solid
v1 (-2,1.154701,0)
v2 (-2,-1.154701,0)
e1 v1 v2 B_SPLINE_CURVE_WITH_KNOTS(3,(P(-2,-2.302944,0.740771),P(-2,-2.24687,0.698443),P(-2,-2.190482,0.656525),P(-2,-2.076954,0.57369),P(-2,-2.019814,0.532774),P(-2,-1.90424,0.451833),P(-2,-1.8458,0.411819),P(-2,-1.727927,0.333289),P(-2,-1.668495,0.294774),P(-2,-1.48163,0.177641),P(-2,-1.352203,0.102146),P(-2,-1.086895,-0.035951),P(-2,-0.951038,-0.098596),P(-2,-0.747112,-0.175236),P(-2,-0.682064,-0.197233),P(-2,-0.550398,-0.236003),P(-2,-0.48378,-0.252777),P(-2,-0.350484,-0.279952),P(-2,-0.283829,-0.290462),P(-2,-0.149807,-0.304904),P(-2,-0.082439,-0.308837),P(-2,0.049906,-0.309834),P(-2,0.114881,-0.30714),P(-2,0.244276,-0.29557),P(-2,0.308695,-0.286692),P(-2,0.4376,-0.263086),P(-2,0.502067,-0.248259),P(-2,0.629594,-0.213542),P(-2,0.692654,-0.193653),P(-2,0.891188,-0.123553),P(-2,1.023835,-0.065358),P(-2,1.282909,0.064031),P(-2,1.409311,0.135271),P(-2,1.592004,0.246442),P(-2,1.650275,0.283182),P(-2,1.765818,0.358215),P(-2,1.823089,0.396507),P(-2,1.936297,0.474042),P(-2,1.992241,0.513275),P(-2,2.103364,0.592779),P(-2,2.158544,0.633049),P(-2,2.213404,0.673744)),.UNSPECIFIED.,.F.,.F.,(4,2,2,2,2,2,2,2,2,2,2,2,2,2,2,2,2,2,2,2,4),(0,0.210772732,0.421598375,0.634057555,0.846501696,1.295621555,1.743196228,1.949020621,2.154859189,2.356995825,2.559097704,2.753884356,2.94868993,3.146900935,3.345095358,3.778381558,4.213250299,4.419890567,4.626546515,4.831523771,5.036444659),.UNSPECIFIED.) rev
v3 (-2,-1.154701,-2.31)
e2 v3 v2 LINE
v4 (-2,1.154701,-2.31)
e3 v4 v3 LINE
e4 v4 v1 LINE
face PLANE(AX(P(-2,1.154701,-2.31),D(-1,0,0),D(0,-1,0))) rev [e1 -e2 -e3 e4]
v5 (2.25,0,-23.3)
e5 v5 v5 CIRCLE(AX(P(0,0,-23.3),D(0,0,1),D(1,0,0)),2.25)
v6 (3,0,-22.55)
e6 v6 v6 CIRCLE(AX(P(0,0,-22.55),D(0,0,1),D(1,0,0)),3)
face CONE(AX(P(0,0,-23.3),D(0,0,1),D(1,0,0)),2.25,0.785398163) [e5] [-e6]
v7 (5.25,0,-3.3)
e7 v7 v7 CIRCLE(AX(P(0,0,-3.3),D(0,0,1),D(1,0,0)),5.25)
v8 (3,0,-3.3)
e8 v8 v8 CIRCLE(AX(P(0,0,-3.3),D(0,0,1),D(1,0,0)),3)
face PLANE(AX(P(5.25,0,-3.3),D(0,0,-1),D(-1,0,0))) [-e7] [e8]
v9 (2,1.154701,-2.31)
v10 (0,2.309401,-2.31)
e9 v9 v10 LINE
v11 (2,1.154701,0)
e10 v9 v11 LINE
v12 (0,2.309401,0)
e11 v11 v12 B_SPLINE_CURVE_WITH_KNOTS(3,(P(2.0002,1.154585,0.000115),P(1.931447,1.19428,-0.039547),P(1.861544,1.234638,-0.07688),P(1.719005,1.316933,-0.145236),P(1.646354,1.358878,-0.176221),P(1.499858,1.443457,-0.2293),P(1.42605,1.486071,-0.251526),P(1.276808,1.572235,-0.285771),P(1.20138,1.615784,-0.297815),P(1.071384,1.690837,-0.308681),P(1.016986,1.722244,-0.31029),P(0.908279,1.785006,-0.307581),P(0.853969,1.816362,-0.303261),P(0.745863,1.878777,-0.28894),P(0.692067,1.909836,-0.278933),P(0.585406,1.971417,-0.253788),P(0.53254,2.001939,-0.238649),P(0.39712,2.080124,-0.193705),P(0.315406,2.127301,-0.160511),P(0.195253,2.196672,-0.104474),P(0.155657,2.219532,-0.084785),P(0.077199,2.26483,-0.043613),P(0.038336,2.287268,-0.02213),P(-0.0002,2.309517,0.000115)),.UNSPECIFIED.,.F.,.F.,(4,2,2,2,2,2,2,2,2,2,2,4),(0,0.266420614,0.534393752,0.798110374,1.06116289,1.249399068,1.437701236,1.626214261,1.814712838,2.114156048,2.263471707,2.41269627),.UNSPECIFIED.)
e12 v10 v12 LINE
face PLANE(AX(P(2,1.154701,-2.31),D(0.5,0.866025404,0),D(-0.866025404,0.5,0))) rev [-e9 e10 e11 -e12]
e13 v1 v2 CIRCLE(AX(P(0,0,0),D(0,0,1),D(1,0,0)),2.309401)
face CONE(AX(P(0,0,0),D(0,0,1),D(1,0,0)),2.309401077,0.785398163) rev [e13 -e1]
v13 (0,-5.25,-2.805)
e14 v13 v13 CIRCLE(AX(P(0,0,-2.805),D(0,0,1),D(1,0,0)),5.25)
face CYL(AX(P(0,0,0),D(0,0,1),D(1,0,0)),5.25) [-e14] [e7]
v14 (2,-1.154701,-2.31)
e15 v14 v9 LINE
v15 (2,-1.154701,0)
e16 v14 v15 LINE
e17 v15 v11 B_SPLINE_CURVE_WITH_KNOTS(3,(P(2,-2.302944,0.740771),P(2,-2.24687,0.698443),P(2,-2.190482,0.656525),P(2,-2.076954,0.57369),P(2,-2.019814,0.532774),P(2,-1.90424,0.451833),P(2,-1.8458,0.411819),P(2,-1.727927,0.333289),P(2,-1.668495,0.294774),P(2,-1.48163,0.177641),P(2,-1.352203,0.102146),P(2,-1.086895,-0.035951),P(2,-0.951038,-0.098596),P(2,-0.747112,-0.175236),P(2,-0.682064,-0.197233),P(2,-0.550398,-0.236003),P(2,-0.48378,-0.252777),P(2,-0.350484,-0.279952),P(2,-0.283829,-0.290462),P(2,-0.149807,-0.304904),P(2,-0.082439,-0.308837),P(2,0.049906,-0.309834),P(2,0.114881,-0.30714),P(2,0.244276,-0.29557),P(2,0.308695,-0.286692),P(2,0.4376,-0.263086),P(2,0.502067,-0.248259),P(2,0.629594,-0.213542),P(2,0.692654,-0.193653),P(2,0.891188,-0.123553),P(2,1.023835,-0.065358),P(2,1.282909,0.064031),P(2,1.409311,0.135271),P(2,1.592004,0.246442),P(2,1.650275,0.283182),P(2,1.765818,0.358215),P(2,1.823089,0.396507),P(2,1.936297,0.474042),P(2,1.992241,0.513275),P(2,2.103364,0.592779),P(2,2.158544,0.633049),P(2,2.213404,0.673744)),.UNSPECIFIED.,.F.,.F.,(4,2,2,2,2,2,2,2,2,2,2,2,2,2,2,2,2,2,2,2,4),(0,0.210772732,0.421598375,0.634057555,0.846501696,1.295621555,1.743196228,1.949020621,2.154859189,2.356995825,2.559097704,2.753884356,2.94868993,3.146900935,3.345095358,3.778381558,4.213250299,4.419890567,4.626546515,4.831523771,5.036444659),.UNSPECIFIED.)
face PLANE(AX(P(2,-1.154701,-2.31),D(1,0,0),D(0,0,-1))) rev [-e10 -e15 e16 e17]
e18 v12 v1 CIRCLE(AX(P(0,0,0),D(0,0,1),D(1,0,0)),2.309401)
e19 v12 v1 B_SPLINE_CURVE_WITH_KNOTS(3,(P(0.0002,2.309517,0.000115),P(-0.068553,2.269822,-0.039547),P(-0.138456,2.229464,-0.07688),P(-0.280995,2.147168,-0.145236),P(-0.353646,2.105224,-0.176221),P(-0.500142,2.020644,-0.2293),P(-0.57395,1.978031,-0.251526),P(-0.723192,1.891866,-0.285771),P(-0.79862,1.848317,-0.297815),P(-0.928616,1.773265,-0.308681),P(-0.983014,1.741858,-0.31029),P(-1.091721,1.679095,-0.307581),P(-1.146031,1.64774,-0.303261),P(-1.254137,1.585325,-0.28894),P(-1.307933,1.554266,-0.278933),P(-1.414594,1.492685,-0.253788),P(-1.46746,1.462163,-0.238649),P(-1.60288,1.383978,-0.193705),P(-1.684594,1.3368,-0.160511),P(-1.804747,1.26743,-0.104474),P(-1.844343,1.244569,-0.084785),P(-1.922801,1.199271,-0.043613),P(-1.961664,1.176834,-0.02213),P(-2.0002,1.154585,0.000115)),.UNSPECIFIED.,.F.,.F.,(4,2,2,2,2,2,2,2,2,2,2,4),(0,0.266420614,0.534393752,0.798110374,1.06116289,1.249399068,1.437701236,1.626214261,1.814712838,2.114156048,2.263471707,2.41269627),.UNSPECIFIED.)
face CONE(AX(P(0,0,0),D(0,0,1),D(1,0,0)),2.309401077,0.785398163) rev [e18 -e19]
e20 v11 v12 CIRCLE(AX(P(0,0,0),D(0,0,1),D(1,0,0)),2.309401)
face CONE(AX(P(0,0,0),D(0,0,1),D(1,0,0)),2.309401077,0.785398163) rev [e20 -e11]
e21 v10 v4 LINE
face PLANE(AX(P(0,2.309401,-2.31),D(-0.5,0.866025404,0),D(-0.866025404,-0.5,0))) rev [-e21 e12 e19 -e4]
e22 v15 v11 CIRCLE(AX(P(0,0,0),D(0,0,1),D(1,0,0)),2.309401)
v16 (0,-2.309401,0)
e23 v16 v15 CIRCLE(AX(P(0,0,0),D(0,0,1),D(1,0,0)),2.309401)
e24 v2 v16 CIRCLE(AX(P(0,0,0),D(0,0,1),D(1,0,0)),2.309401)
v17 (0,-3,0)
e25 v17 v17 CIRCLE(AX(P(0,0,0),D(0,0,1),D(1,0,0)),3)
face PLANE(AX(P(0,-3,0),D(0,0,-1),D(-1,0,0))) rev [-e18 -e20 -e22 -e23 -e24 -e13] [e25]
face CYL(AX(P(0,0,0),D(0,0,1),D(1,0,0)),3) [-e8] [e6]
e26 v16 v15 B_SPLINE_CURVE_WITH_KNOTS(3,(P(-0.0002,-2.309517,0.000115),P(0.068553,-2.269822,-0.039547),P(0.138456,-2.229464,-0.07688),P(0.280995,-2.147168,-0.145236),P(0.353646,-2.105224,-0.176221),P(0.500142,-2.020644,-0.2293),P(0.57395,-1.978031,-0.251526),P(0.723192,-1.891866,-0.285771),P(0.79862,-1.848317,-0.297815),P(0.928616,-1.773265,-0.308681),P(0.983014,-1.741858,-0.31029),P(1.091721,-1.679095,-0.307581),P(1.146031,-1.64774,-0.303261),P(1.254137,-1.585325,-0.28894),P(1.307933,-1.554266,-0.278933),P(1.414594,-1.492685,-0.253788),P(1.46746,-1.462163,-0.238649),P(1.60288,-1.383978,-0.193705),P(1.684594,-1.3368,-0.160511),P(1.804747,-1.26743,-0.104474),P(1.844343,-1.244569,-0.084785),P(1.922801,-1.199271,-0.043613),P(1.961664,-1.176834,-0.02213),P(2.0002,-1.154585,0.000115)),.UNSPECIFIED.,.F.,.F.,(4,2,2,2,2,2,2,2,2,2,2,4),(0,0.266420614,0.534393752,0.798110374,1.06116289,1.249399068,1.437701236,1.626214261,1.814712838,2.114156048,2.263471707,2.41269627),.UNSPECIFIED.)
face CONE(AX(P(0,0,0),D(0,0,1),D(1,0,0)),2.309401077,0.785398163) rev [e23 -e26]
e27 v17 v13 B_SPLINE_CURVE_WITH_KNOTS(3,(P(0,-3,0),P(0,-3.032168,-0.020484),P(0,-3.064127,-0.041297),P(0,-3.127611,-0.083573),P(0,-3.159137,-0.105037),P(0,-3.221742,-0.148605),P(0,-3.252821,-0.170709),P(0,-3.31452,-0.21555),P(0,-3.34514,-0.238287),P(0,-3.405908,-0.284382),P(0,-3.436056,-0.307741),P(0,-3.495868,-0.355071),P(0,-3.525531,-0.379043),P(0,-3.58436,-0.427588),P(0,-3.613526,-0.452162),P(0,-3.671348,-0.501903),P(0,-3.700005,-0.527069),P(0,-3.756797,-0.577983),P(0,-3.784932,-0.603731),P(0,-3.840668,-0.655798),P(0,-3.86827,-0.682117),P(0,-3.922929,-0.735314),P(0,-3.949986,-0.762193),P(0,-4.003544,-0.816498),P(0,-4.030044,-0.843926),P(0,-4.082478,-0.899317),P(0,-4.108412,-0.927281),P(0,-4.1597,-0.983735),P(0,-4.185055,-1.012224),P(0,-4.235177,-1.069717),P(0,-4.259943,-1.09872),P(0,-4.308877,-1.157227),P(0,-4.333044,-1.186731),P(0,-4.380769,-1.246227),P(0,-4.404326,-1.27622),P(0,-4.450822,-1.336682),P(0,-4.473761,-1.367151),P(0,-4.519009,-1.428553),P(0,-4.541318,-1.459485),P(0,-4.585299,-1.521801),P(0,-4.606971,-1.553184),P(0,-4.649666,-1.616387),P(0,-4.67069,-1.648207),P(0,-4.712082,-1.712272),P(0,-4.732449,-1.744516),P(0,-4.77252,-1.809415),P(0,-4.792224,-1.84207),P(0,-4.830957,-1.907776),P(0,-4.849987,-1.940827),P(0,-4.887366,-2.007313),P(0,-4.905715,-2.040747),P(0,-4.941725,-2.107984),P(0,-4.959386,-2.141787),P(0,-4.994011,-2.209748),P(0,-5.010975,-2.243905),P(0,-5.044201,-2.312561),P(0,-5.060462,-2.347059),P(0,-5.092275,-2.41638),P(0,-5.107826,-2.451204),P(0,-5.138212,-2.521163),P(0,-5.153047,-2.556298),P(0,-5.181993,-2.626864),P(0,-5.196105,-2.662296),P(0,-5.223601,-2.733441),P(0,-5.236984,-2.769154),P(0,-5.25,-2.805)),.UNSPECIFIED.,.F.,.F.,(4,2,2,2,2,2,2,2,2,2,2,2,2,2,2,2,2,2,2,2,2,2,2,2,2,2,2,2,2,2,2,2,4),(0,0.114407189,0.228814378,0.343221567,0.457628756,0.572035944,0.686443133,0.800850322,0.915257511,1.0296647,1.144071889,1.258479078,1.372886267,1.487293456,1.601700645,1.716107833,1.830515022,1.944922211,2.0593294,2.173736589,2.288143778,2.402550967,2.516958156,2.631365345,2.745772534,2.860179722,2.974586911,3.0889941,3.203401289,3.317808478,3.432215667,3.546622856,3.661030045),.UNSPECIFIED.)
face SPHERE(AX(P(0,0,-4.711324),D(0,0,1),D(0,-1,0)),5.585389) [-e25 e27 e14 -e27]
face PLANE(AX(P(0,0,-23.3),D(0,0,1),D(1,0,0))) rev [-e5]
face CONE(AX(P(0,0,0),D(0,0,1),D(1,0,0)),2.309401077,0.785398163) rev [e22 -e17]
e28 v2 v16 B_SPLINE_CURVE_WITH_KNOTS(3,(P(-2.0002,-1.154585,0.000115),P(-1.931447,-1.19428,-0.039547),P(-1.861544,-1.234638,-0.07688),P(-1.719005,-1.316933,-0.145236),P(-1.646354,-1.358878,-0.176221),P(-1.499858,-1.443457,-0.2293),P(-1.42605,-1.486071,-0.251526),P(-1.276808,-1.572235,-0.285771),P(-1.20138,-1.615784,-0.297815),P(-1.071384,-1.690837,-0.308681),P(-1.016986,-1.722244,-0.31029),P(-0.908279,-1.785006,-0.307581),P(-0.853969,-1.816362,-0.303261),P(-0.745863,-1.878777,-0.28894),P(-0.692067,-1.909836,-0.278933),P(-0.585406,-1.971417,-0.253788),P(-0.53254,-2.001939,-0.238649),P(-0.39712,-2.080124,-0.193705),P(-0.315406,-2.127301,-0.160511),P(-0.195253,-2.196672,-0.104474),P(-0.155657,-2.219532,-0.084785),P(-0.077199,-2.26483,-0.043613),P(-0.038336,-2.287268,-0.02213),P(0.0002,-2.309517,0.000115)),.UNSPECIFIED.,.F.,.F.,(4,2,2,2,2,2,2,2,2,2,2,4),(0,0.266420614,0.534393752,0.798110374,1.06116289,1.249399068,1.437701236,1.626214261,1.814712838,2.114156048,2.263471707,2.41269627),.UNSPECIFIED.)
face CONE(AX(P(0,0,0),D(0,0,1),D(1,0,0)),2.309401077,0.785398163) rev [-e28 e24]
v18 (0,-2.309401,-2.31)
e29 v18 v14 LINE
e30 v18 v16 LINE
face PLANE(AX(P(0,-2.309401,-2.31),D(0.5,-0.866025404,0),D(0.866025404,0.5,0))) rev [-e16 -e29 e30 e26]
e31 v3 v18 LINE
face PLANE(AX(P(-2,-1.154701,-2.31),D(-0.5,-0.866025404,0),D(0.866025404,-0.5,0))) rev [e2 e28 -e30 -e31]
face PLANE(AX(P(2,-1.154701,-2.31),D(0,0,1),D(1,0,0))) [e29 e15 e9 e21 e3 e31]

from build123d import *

# Parameters (mm, degrees)
CUT_EXTRUDE2_DEPTH = 2.31


with BuildPart() as part:
    # Sketch10 → Revolve3 (revolve)
    with BuildSketch(Plane(origin=(0, 0, 0), x_dir=(0, 0, -1), z_dir=(1, 0, 0)), mode=Mode.PRIVATE) as revolve3_sk:
        Polygon((22.55, 3), (23.3, 2.25), (23.3, 0), (3.3, 0), (3.3, 3), align=None)
    revolve(revolve3_sk.sketch.rotate(Axis((0, 0, 0), (0, 0, -1)), 90), axis=Axis((0, 0, 0), (0, 0, -1)))

    # Sketch7 → Revolve2 (revolve)
    with BuildSketch(Plane(origin=(0, 0, 0), x_dir=(0, 0, -1), z_dir=(1, 0, 0)), mode=Mode.PRIVATE) as revolve2_sk:
        with BuildLine():
            Line((2.805, 5.25), (3.3, 5.25))
            Line((3.3, 5.25), (3.3, 0))
            Line((3.3, 0), (0, 0))
            Line((0, 0), (0, 3))
            ThreePointArc((0, 3), (1.216479019, 4.356906156), (2.805, 5.25))
        make_face()
    revolve(revolve2_sk.sketch.rotate(Axis((0, 0, 0), (0, 0, -1)), 180), axis=Axis((0, 0, 0), (0, 0, -1)))

    # Sketch5 → Cut-Extrude2 (cut)
    with BuildSketch(Plane.XY):
        Polygon((2, -1.154700538), (2, 1.154700538), (0, 2.309401077), (-2, 1.154700538), (-2, -1.154700538), (0, -2.309401077), align=None)
    extrude(amount=-CUT_EXTRUDE2_DEPTH, mode=Mode.SUBTRACT)

    # Cut-Extrude3 cone 1 section (through the dimple's axis) → Cut-Extrude3 (revolve, cut)
    with BuildSketch(Plane(origin=(0, 0, 0), x_dir=(0, -1, 0), z_dir=(1, 0, 0))):
        Polygon((0, 0), (2.309401077, 0), (0, 2.309401077), align=None)
    revolve(axis=Axis((0, 0, 0), (0, 0, -1)), mode=Mode.SUBTRACT)


with BuildPart() as body_2:
    # Split1: read off the stored shape, not the designer's step
    # Split1: the piece on the far side of the plane
    add(part.part)
    split(bisect_by=Plane.XY.offset(-3.3), keep=Keep.BOTTOM)


with BuildPart() as part_1:
    add(part.part)

    # Split1
    split(bisect_by=Plane.XY.offset(-3.3), keep=Keep.TOP)


with BuildPart() as body_2_1:
    add(body_2.part)

    # Boss-Extrude1: read off the stored shape, not the designer's step
    # Boss-Extrude1: union part
    add(part_1.part)


solid = body_2_1.part
